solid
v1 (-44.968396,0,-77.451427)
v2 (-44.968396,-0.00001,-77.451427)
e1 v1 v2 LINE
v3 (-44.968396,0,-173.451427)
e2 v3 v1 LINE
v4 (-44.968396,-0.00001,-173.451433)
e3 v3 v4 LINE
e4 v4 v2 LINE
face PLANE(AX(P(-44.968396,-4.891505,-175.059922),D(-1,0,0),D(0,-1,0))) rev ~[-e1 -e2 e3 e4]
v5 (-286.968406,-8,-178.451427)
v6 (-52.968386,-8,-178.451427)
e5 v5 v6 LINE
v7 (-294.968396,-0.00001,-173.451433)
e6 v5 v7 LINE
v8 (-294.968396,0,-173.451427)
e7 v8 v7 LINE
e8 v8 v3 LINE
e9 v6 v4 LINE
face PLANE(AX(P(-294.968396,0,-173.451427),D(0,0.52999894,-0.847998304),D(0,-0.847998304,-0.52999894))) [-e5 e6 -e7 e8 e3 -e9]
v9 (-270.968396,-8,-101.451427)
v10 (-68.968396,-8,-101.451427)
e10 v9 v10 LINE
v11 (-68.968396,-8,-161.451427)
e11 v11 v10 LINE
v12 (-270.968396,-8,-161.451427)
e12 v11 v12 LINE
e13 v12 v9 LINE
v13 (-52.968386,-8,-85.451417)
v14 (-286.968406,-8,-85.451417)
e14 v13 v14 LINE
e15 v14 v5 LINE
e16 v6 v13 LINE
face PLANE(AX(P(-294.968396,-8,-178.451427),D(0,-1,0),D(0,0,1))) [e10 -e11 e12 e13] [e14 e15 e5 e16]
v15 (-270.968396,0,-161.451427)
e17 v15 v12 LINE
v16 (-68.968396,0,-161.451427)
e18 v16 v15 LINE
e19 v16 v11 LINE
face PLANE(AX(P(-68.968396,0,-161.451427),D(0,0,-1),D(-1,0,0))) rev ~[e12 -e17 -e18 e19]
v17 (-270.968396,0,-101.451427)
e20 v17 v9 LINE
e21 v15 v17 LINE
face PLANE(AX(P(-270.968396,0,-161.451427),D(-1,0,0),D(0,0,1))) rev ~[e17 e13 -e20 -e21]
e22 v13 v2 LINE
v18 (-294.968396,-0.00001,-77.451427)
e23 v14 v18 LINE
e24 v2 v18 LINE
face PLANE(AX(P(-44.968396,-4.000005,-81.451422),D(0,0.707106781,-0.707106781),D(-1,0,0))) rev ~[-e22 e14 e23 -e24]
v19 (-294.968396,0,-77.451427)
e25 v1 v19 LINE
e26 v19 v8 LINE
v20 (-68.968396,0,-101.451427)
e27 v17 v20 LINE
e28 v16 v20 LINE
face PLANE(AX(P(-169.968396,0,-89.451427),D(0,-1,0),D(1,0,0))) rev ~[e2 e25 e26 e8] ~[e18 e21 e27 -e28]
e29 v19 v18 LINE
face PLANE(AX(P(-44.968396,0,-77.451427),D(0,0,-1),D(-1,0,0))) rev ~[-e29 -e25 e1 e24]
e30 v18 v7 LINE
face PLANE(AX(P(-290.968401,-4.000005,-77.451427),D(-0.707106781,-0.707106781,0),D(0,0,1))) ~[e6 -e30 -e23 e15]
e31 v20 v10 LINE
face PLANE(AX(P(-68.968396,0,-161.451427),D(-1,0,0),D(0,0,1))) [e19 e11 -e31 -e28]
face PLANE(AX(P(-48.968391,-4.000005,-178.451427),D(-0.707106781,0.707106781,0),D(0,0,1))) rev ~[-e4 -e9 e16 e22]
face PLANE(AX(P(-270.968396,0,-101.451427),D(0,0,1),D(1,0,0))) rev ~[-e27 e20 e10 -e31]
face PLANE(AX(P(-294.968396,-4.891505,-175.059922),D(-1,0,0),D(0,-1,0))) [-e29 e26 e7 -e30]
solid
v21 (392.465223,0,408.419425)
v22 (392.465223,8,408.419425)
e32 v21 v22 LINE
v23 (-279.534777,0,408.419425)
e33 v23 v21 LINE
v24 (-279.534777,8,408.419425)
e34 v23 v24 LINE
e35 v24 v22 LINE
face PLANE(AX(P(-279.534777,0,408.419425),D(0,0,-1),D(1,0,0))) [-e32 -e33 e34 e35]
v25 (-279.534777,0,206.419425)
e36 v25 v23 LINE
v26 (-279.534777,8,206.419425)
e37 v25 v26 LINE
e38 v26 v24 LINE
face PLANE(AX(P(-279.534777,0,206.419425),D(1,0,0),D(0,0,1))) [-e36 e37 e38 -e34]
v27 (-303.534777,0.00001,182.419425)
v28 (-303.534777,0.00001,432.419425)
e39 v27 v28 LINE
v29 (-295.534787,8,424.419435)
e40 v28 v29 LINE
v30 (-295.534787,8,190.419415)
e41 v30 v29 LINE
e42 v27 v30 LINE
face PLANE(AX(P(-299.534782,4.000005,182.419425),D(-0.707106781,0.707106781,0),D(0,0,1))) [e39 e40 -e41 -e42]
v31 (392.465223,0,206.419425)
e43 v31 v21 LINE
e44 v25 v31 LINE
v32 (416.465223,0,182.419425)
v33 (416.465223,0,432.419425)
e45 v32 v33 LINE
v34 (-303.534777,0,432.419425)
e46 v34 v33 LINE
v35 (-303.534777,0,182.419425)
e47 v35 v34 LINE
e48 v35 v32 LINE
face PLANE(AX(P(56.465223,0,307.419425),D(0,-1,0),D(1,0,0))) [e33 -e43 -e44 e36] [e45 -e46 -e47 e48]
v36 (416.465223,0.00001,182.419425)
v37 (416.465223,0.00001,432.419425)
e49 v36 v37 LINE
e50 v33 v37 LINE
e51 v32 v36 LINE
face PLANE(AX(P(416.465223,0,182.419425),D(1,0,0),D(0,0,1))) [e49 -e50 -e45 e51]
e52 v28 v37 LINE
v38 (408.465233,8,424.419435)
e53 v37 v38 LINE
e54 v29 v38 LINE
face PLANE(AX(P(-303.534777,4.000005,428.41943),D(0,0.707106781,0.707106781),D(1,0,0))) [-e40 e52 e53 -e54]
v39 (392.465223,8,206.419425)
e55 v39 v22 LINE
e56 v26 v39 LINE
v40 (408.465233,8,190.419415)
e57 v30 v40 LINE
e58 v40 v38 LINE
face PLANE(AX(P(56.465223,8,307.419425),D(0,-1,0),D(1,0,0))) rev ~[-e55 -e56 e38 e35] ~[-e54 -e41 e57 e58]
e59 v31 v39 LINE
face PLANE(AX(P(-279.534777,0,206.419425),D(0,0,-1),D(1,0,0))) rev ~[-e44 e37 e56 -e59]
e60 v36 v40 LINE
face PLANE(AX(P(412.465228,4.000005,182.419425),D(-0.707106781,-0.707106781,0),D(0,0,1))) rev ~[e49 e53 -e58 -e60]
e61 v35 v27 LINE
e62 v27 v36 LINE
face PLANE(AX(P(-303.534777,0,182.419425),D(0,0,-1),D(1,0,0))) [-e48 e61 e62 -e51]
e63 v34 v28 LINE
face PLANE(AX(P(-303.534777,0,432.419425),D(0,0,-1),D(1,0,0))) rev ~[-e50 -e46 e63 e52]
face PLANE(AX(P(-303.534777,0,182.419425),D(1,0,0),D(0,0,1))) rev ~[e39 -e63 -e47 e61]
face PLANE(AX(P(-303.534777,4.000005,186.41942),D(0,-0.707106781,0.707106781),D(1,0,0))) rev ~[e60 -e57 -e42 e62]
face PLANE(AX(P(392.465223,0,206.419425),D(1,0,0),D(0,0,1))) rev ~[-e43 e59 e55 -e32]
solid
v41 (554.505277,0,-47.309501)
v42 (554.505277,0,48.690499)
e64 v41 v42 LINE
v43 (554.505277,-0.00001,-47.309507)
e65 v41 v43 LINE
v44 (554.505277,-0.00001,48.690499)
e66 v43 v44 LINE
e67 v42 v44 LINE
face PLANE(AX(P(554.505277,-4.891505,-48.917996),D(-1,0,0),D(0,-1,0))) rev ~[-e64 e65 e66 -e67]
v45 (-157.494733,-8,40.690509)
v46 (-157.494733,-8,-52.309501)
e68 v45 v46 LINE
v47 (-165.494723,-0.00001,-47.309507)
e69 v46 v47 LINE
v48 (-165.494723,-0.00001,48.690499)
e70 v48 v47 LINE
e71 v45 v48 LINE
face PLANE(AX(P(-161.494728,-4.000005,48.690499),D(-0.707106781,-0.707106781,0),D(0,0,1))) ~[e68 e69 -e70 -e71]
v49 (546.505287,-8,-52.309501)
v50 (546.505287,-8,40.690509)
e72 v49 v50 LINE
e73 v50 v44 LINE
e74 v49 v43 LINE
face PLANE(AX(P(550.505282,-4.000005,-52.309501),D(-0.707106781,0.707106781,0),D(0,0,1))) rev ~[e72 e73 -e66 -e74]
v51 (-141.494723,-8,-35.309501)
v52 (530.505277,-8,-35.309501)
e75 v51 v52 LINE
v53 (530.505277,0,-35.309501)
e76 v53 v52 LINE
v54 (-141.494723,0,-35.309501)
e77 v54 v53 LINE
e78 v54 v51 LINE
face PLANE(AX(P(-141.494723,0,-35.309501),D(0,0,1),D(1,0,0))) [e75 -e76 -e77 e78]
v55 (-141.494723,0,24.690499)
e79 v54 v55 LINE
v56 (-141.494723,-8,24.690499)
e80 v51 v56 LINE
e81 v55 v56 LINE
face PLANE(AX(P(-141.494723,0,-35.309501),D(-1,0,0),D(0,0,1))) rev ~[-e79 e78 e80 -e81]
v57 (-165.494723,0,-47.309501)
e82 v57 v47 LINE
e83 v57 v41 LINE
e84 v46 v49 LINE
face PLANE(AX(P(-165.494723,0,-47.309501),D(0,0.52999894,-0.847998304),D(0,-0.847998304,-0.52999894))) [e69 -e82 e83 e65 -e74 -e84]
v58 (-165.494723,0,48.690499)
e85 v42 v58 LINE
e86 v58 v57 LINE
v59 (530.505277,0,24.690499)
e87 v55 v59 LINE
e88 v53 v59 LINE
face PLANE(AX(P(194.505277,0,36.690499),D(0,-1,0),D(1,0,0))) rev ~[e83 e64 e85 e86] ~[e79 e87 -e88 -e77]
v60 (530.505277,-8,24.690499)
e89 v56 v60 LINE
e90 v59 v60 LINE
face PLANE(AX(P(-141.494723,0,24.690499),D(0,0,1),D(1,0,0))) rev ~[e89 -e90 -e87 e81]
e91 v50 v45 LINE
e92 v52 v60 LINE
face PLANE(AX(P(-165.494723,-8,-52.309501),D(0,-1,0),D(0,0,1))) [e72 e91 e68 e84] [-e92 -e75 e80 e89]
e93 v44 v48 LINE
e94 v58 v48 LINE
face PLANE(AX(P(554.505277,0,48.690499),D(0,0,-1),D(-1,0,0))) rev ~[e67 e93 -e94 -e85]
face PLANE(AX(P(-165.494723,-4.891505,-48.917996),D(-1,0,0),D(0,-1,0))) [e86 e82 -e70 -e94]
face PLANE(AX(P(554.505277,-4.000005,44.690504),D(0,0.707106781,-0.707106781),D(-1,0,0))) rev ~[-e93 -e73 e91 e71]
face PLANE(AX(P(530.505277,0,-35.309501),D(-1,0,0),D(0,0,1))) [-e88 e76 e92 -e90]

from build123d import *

# Parameters (mm, degrees)
F0_W      = 672
F0_H      = 24
F0_W_2    = 24
F0_H_2    = 60
F0_H_3    = 12
F1_DEPTH  = 8
F3_DEPTH  = 720
F4_SIZE   = 7.99999
F5_W      = 202
F5_H      = 24
F5_W_2    = 24
F5_H_2    = 60
F5_H_3    = 12
F6_DEPTH  = 8
F8_DEPTH  = 250
F9_SIZE   = 7.99999
F10_W     = 720
F10_H     = 250
F11_DEPTH = 8
F12_SIZE  = 7.99999
F13_W     = 672
F13_H     = 202
F14_DEPTH = 25


# Not quite as in the source:
# - a fillet or chamfer is up to 0.001 mm smaller than in the source, because OpenCascade refuses the exact size


with BuildPart() as f1:
    # F0 (on Front) → F1 (new body)
    with BuildSketch(Plane.XZ):
        with Locations((194.5052774136, 36.6904993206)):
            Rectangle(F0_W, F0_H)
        with Locations((-153.4947225864, 36.6904993206)):
            Rectangle(F0_W_2, F0_H)
        with Locations((-153.4947225864, -5.3095006794)):
            Rectangle(F0_W_2, F0_H_2)
        with Locations((-153.4947225864, -41.3095006794)):
            Rectangle(F0_W_2, F0_H_3)
        with Locations((194.5052774136, -41.3095006794)):
            Rectangle(F0_W, F0_H_3)
        with Locations((542.5052774136, -5.3095006794)):
            Rectangle(F0_W_2, F0_H_2)
        with Locations((542.5052774136, 36.6904993206)):
            Rectangle(F0_W_2, F0_H)
        with Locations((542.5052774136, -41.3095006794)):
            Rectangle(F0_W_2, F0_H_3)
    extrude(amount=F1_DEPTH)

    # F2 (on face) → F3 (join)
    with BuildSketch(Plane(origin=(-165.4947225864, 0, 0), x_dir=(0, -1, 0), z_dir=(-1, 0, 0))):
        Polygon((8, -52.3095006794), (8, -47.3095006794), (0, -47.3095006794), align=None)
    extrude(amount=-F3_DEPTH)

    # F4 (size 8 in the source; OpenCascade refuses exactly that, so slightly less here)
    f4_edges = [f1.edges().sort_by_distance(p)[0] for p in [
        (554.505277, -8, -1.809501),
        (194.505277, -8, 48.690499),
        (-165.494723, -8, -1.809501),
    ]]
    chamfer(f4_edges, length=F4_SIZE)


with BuildPart() as f6:
    # F5 (on Front) → F6 (new body)
    with BuildSketch(Plane.XZ):
        with Locations((-169.9683964583, -89.4514269531)):
            Rectangle(F5_W, F5_H)
        with Locations((-282.9683964583, -89.4514269531)):
            Rectangle(F5_W_2, F5_H)
        with Locations((-282.9683964583, -131.4514269531)):
            Rectangle(F5_W_2, F5_H_2)
        with Locations((-282.9683964583, -167.4514269531)):
            Rectangle(F5_W_2, F5_H_3)
        with Locations((-169.9683964583, -167.4514269531)):
            Rectangle(F5_W, F5_H_3)
        with Locations((-56.9683964583, -167.4514269531)):
            Rectangle(F5_W_2, F5_H_3)
        with Locations((-56.9683964583, -131.4514269531)):
            Rectangle(F5_W_2, F5_H_2)
        with Locations((-56.9683964583, -89.4514269531)):
            Rectangle(F5_W_2, F5_H)
    extrude(amount=F6_DEPTH)

    # F7 (on face) → F8 (join)
    with BuildSketch(Plane(origin=(-294.9683964583, 0, 0), x_dir=(0, -1, 0), z_dir=(-1, 0, 0))):
        Polygon((8, -178.4514269531), (8, -173.4514269531), (0, -173.4514269531), align=None)
    extrude(amount=-F8_DEPTH)

    # F9 (size 8 in the source; OpenCascade refuses exactly that, so slightly less here)
    f9_edges = [f6.edges().sort_by_distance(p)[0] for p in [
        (-169.968396, -8, -77.451427),
        (-294.968396, -8, -127.951427),
        (-44.968396, -8, -127.951427),
    ]]
    chamfer(f9_edges, length=F9_SIZE)


with BuildPart() as f11:
    # F10 (on Front) → F11 (new body)
    with BuildSketch(Plane.XZ):
        with Locations((56.4652234316, 307.4194252866)):
            Rectangle(F10_W, F10_H)
    extrude(amount=-F11_DEPTH)

    # F12 (size 8 in the source; OpenCascade refuses exactly that, so slightly less here)
    f12_edges = [f11.edges().sort_by_distance(p)[0] for p in [
        (56.465223, 8, 182.419425),
        (416.465223, 8, 307.419425),
        (56.465223, 8, 432.419425),
        (-303.534777, 8, 307.419425),
    ]]
    chamfer(f12_edges, length=F12_SIZE)

    # F13 (on face) → F14 (cut)
    with BuildSketch(Plane.XZ):
        with Locations((56.4652234316, 307.4194252866)):
            Rectangle(F13_W, F13_H)
    extrude(amount=-F14_DEPTH, mode=Mode.SUBTRACT)


solid = Compound([f1.part, f6.part, f11.part])
